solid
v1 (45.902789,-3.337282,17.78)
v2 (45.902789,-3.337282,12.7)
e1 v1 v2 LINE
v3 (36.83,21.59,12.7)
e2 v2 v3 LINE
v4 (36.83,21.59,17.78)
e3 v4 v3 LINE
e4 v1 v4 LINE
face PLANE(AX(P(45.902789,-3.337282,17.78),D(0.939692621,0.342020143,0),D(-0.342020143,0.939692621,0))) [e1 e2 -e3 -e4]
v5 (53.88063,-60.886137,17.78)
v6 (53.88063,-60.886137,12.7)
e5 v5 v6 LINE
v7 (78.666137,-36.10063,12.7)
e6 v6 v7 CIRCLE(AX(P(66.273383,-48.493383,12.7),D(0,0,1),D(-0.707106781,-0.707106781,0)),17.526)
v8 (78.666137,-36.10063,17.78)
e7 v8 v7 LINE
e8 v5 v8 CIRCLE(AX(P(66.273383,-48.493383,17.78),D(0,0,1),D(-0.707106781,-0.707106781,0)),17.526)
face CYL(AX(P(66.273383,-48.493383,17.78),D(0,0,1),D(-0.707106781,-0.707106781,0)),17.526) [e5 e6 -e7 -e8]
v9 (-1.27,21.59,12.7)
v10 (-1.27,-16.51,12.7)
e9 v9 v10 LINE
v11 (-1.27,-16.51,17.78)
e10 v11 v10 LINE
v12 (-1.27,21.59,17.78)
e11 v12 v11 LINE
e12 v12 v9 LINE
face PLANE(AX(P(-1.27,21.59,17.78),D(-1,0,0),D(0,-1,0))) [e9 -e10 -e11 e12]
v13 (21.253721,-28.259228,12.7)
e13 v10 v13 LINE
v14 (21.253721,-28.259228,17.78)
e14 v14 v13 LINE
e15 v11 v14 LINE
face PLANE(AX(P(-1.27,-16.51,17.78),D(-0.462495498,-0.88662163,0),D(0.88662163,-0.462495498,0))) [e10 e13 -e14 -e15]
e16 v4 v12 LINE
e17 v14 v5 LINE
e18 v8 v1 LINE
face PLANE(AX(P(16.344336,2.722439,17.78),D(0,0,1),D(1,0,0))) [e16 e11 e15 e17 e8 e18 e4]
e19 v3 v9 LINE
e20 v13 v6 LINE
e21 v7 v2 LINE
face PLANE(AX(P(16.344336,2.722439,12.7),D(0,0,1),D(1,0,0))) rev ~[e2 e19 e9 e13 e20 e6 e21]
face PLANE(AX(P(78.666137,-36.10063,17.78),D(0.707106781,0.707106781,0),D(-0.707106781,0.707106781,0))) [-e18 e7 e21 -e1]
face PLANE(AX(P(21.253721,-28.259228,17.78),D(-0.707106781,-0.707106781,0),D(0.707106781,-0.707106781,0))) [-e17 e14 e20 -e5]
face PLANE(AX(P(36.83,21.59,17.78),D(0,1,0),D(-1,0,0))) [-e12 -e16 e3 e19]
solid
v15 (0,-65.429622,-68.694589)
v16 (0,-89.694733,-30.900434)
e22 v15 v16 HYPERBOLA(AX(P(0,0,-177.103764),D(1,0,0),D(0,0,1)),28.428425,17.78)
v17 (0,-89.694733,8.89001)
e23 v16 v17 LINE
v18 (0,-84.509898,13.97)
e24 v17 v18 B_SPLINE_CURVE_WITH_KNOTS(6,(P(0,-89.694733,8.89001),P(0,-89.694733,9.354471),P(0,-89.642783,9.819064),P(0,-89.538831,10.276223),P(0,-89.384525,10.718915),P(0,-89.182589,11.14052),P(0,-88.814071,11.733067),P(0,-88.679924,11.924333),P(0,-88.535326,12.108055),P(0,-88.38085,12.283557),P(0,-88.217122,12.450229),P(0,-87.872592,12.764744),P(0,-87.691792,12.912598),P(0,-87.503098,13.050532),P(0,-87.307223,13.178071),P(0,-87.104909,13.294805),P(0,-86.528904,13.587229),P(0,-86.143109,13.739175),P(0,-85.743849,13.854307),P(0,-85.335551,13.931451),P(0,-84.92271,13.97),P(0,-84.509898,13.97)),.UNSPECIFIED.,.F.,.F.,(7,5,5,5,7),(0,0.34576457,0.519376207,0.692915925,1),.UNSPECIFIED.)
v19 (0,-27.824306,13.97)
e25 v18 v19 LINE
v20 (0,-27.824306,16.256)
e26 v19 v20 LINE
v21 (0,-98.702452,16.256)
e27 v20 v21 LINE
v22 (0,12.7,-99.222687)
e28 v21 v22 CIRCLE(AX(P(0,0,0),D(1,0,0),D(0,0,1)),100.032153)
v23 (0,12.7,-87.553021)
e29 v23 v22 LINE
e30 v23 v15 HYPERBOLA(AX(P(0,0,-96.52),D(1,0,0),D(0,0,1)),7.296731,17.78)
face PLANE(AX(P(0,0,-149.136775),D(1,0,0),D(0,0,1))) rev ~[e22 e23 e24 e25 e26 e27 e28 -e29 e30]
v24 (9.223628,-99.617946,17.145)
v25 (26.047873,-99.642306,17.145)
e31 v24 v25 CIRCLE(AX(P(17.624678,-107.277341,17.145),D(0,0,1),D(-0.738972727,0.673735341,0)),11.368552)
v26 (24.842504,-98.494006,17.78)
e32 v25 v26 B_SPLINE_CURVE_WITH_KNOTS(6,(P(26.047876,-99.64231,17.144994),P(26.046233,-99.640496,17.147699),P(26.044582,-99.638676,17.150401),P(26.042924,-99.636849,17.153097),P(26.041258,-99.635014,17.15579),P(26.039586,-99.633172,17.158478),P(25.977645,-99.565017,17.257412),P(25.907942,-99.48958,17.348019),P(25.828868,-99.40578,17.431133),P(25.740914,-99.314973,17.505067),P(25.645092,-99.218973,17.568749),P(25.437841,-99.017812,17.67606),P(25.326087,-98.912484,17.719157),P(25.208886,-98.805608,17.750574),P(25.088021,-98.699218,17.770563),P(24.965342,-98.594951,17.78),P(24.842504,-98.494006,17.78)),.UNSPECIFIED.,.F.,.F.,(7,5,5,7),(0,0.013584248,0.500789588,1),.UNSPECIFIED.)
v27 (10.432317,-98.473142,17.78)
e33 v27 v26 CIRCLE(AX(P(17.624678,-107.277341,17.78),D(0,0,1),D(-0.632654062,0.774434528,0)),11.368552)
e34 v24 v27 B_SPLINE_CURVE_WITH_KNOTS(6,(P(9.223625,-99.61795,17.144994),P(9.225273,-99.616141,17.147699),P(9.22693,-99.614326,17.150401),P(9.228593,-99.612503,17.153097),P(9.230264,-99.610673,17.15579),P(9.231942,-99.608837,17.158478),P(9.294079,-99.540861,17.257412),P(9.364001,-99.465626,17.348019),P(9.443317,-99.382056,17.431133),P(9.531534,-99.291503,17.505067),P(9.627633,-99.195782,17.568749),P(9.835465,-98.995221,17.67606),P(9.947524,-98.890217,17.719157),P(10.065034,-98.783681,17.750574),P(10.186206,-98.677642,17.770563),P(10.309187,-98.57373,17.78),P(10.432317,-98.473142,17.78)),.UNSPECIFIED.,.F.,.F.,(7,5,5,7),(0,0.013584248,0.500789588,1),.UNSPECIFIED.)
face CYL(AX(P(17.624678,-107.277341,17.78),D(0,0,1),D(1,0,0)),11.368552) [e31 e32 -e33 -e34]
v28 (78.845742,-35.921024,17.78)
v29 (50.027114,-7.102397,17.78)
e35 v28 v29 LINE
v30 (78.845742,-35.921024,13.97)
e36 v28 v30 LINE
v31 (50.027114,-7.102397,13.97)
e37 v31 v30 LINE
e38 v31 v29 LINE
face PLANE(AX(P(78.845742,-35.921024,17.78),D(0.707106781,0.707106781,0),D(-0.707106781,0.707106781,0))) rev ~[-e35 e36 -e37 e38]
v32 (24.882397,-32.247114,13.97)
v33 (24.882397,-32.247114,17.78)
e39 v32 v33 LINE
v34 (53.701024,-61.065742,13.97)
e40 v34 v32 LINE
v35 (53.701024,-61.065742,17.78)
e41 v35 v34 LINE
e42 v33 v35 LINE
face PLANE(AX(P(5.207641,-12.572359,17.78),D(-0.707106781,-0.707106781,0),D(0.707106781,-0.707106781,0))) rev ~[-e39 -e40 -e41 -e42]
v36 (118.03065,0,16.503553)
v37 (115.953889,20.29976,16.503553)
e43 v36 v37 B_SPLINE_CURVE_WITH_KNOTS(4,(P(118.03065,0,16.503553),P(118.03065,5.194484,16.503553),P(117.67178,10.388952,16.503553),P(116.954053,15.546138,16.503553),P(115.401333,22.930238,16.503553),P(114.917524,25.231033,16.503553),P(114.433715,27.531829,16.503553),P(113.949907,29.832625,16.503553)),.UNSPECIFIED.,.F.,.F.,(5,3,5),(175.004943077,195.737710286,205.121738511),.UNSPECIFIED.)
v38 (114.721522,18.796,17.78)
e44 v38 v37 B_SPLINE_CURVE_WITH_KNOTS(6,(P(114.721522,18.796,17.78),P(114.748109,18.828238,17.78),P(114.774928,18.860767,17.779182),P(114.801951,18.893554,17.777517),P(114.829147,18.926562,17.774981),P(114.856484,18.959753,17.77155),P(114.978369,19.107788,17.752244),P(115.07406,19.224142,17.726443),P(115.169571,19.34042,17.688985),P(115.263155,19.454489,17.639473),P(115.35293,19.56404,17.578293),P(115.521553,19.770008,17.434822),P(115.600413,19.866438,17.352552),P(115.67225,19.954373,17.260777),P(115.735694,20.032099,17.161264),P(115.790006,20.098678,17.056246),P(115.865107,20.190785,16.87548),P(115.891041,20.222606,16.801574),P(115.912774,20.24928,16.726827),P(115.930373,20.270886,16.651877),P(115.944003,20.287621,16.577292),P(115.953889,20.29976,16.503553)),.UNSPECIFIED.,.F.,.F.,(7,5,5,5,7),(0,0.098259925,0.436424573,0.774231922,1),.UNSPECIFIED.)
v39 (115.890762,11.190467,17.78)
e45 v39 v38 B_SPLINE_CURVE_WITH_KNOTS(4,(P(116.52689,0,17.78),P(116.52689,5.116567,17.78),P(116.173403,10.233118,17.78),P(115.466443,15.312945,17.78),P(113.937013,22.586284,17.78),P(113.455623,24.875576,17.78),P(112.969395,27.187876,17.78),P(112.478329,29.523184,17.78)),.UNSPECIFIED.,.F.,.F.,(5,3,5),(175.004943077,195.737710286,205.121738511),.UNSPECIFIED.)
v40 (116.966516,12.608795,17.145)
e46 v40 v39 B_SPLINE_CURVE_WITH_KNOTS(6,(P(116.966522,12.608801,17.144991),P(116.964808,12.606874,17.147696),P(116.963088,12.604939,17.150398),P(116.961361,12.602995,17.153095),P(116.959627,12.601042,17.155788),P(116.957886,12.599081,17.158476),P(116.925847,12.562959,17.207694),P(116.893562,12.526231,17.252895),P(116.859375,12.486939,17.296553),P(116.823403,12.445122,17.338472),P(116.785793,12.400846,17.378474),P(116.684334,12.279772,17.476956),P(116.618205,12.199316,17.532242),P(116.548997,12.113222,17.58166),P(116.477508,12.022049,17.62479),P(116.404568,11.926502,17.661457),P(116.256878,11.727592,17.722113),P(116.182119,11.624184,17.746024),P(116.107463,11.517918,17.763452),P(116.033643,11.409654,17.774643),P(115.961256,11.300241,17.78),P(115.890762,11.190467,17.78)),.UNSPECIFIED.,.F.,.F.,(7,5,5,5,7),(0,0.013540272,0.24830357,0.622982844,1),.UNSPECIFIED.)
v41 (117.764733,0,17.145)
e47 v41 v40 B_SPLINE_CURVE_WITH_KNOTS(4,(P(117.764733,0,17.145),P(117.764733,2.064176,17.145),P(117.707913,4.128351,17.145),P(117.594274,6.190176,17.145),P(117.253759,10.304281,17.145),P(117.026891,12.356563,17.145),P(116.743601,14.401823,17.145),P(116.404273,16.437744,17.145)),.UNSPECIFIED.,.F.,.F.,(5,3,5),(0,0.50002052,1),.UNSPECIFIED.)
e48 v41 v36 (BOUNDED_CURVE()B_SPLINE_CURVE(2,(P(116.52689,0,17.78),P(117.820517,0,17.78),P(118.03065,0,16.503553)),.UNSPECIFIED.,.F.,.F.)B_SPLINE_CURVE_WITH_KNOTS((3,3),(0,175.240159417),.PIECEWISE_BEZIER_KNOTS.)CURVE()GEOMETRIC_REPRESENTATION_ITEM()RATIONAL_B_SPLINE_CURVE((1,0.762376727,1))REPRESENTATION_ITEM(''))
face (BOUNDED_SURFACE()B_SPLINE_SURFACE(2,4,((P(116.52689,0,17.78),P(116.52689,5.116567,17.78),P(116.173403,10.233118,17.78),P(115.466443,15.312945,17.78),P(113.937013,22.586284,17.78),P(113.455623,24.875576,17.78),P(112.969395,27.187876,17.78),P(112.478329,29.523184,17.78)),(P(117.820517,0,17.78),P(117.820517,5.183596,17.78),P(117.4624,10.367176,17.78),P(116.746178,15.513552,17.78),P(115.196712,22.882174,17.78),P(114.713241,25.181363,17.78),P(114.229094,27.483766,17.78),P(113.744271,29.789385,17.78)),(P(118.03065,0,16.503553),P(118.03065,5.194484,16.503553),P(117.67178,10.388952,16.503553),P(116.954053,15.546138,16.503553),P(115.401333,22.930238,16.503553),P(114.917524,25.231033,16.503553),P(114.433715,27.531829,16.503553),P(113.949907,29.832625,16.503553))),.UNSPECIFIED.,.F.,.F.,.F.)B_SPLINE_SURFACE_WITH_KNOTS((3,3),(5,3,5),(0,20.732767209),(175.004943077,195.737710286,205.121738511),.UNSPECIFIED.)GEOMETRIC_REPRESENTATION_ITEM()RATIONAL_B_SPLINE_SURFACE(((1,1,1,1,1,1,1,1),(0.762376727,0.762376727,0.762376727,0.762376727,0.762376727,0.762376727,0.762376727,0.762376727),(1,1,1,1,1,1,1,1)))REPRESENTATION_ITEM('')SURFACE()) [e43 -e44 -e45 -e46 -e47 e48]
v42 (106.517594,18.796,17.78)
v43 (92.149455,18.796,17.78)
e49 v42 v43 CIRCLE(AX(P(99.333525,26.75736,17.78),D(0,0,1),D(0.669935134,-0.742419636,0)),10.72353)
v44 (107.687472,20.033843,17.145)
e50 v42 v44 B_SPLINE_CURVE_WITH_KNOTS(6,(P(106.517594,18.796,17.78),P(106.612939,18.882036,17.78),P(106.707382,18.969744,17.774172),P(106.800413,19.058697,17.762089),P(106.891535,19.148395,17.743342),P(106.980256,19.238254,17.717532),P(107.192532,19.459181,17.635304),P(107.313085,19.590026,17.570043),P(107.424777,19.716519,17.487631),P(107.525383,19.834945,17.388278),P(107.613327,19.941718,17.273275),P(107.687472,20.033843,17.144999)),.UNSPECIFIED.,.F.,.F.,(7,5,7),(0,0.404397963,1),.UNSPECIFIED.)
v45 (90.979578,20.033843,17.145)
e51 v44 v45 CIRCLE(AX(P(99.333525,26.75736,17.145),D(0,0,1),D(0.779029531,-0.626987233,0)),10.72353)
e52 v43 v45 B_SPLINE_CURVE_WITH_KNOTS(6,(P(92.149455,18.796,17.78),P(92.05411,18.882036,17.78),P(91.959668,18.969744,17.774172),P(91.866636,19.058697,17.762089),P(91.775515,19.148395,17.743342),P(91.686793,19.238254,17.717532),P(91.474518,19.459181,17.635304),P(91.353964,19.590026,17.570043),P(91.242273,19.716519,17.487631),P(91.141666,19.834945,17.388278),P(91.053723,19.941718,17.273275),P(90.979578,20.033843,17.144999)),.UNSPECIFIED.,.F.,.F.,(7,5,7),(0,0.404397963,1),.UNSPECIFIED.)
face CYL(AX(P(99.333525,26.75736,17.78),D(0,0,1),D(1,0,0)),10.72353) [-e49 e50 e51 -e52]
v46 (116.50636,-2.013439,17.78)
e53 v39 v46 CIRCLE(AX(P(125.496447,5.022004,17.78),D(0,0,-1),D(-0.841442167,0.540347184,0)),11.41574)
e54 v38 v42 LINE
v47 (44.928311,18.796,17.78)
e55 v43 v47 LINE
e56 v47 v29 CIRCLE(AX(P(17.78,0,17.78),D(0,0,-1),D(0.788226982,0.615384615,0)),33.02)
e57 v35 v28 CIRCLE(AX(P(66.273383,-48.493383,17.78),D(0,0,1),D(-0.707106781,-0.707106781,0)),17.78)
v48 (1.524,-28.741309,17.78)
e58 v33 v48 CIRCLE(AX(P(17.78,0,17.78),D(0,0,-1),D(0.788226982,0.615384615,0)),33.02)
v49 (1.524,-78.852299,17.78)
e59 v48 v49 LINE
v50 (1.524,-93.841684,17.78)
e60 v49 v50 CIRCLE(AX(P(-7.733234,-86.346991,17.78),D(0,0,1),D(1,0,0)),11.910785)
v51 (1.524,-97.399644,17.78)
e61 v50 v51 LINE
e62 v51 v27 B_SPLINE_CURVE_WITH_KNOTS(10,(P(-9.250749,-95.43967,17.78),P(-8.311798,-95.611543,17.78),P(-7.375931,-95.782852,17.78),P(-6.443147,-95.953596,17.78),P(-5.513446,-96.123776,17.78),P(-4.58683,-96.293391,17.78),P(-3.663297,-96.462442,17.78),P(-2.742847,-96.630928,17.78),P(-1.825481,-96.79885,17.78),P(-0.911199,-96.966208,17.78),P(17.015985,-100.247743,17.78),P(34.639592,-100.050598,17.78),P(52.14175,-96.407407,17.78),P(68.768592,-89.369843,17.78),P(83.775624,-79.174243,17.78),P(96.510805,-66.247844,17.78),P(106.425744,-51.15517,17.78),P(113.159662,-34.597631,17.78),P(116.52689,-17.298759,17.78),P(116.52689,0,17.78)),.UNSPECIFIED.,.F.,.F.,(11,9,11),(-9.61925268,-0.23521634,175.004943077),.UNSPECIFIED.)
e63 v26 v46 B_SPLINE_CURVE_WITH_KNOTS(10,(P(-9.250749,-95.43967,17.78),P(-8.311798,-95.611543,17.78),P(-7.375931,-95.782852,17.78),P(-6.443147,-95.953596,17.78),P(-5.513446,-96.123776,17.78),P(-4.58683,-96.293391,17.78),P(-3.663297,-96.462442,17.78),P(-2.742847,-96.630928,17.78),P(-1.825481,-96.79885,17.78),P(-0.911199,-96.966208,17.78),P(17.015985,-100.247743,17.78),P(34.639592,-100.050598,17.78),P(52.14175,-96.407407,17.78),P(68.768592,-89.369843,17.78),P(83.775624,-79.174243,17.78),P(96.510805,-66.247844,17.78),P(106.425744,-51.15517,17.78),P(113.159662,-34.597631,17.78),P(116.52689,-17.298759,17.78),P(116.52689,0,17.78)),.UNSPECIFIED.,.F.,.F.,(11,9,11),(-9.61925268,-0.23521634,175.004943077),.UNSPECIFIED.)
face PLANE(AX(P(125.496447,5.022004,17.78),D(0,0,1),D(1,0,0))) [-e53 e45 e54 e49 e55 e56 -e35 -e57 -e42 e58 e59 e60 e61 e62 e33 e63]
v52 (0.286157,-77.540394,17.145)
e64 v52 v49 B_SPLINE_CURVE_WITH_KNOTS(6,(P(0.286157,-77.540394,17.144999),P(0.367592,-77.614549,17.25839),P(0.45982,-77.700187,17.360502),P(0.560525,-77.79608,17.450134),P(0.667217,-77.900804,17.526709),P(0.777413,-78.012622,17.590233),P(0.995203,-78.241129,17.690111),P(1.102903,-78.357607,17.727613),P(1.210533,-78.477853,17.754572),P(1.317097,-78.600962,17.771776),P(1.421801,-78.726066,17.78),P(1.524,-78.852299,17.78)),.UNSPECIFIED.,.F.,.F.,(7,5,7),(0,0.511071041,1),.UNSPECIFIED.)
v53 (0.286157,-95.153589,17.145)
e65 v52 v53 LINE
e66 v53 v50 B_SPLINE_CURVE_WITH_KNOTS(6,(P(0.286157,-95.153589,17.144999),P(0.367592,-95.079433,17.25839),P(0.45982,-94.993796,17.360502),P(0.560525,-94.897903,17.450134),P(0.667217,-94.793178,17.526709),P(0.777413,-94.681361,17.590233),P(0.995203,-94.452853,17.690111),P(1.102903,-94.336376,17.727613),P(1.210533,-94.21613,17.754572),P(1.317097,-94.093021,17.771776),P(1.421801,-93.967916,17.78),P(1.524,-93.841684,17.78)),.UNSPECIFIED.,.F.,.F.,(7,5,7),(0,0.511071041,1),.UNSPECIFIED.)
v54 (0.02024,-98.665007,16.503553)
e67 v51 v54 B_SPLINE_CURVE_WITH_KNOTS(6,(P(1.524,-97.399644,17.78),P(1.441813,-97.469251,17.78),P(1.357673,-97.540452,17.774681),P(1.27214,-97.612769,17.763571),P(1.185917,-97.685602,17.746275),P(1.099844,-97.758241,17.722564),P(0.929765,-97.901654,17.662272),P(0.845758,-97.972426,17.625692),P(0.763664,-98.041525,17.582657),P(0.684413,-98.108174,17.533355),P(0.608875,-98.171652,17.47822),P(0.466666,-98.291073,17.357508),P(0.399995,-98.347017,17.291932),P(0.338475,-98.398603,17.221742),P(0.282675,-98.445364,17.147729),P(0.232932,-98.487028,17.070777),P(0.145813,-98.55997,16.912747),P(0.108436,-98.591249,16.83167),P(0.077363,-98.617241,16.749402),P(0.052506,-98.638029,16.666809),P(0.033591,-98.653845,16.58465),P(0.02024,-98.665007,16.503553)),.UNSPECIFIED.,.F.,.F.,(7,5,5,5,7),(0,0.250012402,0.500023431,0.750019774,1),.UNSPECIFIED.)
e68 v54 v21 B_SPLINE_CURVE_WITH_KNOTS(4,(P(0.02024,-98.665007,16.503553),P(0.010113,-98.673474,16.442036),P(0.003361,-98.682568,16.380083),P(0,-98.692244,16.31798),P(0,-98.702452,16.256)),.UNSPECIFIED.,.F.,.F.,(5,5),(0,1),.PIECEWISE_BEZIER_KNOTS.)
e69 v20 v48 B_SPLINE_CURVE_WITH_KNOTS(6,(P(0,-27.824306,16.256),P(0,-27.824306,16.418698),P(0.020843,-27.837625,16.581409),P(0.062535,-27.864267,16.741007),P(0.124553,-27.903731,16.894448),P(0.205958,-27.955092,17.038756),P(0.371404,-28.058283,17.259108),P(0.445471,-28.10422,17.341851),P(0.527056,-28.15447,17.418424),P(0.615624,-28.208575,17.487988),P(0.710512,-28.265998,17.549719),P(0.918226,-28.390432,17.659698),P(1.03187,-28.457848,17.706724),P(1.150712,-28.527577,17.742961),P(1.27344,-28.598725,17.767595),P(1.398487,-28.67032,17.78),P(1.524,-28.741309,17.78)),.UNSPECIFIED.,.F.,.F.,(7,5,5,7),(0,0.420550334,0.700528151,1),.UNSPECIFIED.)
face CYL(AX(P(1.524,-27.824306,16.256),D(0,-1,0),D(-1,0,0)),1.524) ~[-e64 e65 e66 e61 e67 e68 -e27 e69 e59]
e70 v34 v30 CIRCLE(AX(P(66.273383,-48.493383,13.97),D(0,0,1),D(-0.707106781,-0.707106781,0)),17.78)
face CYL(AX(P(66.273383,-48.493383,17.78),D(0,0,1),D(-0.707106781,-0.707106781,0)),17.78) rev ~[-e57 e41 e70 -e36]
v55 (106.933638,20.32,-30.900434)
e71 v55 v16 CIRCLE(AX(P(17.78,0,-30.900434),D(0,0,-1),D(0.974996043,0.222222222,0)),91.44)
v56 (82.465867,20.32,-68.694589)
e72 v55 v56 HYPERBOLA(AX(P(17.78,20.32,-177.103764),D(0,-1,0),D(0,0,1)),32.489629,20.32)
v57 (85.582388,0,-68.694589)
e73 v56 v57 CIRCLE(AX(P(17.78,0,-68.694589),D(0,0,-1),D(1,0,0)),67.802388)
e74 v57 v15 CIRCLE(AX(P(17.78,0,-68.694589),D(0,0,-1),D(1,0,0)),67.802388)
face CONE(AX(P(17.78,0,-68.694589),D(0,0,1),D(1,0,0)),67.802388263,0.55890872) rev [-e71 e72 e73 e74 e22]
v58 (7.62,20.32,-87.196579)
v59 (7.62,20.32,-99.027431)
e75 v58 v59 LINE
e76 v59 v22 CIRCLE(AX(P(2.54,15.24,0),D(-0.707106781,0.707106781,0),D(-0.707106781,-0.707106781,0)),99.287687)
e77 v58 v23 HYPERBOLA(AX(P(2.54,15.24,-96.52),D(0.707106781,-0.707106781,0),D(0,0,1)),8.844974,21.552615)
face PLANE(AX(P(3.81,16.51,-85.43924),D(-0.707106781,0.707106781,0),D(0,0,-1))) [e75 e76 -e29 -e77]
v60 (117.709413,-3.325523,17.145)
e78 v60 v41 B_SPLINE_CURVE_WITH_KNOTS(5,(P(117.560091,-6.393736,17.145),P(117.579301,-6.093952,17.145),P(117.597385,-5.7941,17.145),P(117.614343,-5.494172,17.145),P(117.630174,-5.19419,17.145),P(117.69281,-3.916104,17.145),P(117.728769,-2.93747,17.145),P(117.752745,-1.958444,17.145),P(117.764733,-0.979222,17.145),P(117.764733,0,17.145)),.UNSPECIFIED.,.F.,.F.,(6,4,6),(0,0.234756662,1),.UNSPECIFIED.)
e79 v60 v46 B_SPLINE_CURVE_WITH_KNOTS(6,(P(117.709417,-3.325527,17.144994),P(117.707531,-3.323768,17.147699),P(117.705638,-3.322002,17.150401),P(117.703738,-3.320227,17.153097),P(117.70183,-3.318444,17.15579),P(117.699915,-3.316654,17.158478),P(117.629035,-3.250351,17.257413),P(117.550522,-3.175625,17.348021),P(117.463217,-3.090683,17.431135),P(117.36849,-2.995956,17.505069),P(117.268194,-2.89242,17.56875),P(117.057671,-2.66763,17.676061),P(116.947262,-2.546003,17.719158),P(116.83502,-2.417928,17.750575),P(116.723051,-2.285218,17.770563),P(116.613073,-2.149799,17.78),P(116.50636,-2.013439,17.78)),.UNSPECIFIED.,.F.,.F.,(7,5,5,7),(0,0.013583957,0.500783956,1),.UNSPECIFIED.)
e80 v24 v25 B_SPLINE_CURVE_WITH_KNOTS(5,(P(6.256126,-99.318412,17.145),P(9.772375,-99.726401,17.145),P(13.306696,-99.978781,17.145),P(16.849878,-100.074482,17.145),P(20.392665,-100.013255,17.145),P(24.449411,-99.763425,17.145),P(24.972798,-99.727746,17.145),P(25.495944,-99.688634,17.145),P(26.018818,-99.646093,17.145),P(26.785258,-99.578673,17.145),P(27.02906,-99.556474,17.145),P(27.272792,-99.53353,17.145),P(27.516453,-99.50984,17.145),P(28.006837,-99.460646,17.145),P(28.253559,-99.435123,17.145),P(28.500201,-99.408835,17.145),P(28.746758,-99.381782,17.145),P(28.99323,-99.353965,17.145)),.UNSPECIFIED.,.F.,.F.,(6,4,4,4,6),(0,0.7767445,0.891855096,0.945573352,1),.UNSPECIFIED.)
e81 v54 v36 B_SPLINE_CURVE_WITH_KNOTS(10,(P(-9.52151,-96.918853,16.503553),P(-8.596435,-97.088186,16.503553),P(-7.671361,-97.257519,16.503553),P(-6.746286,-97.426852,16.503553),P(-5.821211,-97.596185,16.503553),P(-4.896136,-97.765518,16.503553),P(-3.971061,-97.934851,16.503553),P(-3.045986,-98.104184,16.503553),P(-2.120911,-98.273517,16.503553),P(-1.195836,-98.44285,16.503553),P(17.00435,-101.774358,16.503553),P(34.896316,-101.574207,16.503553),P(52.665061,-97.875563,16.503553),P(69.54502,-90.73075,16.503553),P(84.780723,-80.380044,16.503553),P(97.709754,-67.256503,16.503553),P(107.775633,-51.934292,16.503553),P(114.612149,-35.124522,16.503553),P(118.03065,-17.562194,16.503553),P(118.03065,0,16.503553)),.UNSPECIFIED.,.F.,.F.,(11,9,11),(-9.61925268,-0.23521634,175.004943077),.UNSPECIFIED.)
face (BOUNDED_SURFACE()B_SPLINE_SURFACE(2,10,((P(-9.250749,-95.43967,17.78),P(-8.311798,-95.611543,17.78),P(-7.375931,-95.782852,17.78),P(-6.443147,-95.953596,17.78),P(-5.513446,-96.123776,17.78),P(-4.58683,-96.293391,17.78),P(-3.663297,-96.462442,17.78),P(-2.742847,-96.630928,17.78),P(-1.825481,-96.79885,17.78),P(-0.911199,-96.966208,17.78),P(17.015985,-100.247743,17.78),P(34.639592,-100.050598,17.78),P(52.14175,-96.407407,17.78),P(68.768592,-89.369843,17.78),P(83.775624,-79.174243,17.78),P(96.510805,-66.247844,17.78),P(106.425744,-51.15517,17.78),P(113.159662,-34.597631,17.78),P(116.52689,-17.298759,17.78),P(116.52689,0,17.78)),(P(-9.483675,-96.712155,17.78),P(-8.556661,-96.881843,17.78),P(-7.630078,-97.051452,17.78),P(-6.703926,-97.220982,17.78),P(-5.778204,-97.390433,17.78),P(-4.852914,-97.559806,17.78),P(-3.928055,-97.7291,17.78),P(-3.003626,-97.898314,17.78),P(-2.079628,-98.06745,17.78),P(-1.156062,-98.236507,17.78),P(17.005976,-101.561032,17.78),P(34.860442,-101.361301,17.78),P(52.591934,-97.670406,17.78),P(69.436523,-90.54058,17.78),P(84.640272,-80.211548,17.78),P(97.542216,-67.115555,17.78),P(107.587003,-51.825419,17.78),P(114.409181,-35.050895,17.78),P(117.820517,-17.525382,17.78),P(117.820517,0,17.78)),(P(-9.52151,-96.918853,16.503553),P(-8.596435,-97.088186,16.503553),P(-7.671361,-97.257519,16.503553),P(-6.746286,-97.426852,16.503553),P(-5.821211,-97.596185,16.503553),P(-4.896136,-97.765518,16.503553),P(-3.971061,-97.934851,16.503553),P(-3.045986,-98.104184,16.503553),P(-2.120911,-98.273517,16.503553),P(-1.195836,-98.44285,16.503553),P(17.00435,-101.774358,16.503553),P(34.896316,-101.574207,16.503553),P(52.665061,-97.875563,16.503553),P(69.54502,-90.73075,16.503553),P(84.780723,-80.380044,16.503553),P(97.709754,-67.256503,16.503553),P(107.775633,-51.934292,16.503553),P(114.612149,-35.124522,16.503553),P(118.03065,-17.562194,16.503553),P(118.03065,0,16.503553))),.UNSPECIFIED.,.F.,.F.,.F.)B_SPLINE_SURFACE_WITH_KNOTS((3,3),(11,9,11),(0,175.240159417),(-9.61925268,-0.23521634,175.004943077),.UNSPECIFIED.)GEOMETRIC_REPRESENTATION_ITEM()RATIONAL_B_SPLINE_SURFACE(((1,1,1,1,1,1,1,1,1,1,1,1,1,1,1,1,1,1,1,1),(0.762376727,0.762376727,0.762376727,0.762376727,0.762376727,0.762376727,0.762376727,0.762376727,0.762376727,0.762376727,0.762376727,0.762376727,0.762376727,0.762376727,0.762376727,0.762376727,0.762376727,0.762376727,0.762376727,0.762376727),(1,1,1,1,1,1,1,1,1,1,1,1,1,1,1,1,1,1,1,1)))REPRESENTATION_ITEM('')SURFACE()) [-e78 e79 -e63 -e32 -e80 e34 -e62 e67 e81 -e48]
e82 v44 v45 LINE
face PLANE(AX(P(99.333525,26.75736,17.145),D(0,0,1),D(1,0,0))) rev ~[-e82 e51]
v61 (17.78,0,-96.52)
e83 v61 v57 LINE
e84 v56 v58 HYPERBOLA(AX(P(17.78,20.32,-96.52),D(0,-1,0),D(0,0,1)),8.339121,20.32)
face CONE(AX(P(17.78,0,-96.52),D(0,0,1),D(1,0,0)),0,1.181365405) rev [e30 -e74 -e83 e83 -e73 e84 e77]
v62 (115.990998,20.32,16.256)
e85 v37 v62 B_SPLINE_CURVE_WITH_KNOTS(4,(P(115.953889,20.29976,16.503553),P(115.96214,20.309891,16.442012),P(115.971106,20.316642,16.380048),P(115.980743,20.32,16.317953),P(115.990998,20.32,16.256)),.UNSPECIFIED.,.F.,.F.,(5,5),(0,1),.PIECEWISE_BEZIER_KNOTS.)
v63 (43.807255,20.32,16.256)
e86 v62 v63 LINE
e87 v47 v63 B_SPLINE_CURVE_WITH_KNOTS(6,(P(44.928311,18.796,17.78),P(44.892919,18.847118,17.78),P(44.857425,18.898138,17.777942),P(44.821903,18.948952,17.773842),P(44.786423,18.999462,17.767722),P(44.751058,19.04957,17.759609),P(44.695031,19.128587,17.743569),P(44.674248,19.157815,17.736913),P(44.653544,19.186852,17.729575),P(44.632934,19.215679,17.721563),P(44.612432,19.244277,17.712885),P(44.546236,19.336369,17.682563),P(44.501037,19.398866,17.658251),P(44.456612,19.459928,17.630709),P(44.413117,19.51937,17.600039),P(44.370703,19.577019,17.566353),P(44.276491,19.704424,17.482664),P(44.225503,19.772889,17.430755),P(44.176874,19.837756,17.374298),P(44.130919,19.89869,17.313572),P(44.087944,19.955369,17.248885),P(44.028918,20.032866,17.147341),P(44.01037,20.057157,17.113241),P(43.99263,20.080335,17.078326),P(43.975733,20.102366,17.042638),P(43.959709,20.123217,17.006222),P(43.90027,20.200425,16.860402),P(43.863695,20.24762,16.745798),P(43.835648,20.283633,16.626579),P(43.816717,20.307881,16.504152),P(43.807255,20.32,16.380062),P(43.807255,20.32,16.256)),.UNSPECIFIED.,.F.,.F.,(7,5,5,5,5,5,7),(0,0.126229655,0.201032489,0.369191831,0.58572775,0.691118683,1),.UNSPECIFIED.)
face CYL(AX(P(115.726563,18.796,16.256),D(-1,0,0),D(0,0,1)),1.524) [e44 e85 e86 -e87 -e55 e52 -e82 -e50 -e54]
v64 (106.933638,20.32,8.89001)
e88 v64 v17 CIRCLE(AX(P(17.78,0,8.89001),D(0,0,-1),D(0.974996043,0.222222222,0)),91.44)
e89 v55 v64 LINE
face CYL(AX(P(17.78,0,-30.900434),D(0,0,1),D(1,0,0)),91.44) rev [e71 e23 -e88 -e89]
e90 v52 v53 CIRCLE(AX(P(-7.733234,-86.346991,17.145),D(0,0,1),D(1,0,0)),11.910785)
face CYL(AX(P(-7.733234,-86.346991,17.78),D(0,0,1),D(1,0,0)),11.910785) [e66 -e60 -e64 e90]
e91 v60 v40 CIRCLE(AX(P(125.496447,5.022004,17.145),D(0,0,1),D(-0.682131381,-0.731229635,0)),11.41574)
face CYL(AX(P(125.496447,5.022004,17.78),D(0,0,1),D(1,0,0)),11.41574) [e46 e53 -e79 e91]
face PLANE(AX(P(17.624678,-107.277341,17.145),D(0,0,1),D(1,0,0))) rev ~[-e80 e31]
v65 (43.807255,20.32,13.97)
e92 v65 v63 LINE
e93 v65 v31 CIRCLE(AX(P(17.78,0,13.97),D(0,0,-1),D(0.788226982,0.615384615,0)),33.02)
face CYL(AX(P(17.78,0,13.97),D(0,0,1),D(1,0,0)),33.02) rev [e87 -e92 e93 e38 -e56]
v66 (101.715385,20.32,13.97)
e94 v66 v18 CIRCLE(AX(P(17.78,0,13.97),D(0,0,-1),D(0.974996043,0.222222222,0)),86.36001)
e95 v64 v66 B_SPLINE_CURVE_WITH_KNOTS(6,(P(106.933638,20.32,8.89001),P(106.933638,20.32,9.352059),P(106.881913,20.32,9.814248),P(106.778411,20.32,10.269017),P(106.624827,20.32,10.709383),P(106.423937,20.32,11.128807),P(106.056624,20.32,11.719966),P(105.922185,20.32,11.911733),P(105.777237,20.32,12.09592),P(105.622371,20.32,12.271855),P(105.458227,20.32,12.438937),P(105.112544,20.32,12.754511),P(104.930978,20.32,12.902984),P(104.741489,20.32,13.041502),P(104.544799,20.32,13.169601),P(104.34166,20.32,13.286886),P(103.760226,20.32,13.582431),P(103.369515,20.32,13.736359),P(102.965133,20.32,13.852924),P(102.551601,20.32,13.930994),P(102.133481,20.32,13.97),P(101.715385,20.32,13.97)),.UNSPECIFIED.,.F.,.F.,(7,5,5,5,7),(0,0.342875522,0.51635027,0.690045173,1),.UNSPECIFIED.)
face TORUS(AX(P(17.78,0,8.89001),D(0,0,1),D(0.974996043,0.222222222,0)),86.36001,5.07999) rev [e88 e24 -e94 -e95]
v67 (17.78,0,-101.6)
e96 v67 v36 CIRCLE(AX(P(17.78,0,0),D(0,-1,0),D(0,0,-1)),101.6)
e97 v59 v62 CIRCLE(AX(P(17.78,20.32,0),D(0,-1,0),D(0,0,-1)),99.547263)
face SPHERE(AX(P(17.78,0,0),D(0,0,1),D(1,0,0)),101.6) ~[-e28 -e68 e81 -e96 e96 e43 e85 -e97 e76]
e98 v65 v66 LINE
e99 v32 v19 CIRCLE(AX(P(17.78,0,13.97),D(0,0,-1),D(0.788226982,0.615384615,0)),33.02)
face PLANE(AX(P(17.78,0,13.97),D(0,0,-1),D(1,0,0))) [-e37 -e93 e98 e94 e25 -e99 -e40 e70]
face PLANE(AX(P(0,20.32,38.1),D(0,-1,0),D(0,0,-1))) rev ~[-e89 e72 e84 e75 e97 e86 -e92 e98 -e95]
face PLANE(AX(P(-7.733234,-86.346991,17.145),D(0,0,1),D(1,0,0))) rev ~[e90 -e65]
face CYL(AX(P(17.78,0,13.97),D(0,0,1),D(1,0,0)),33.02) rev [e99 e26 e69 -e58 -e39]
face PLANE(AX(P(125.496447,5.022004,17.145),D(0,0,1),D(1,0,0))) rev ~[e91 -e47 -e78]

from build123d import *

# Parameters (mm, degrees)
F3_DEPTH  = 127
F5_DEPTH  = 254
F8_SIZE   = 7.62
F10_DEPTH = 10.16
F11_R     = 5.07999
F12_R     = 1.524
F14_DEPTH = 5.08
F15_R     = 11.4157397534
F15_R_2   = 10.7235303576
F15_R_3   = 11.3685520534
F15_R_4   = 11.9107845334
F16_DEPTH = 0.635


# Not quite as in the source:
# - a fillet or chamfer is up to 0.001 mm smaller than in the source, because OpenCascade refuses the exact size


with BuildPart() as f1:
    # F0 (on Front) → F1 (revolve)
    with BuildSketch(Plane.XZ):
        with BuildLine():
            ThreePointArc((17.78, -101.6), (119.38, 0), (17.78, 101.6))
            Line((17.78, 101.6), (17.78, -101.6))
        make_face()
    revolve(axis=Axis((17.78, 0, 0), (0, 0, -1)))

    # F2 (on Front) → F3 (cut, symmetric)
    with BuildSketch(Plane.XZ):
        with BuildLine():
            Line((0, -149.136774605), (0, 17.78))
            Line((0, 17.78), (166.8577827513, 17.78))
            ThreePointArc((166.8577827513, 17.78), (-88.4894929474, 106.1792374941), (0, -149.136774605))
        make_face()
    extrude(amount=F3_DEPTH, both=True, mode=Mode.SUBTRACT)

    # F4 (on Right) → F5 (cut, symmetric)
    with BuildSketch(Plane.YZ):
        Polygon((156.3395333682, 38.1), (20.32, 38.1), (20.32, 17.78), (20.32, -154.5686624048), (156.3395333682, -154.5686624048), align=None)
    extrude(amount=F5_DEPTH, both=True, mode=Mode.SUBTRACT)

    # F6 (on Front) → F7 (revolve, cut)
    with BuildSketch(Plane.XZ):
        Polygon((50.8, 17.78), (17.78, 17.78), (17.78, -96.52), (85.5823882628, -68.6945889125), (109.22, -30.9004336539), (109.22, 13.97), (50.8, 13.97), align=None)
    revolve(axis=Axis((17.78, 0, 0), (0, 0, -1)), mode=Mode.SUBTRACT)

    # F8
    f8_edges = [f1.edges().sort_by_distance(p)[0] for p in [
        (0, 20.32, -91.692902),
    ]]
    chamfer(f8_edges, length=F8_SIZE)

    # F9 (on face) → F10 (cut)
    with BuildSketch(Plane.XY.offset(17.78)):
        with BuildLine():
            ThreePointArc((30.3523585695, 12.5723585695), (5.2076414305, 12.5723585695), (5.2076414305, -12.5723585695))
            Line((5.2076414305, -12.5723585695), (53.7010244843, -61.0657416233))
            ThreePointArc((53.7010244843, -61.0657416233), (78.8457416233, -61.0657416233), (78.8457416233, -35.9210244843))
            Line((78.8457416233, -35.9210244843), (30.3523585695, 12.5723585695))
        make_face()
    extrude(amount=-F10_DEPTH, mode=Mode.SUBTRACT)

    # F11 (radius 5.08 in the source; OpenCascade refuses exactly that, so slightly less here)
    f11_edges = [f1.edges().sort_by_distance(p)[0] for p in [
        (83.349501, -63.733148, 13.97),
    ]]
    fillet(f11_edges, radius=F11_R)

    # F12
    f12_edges = [f1.edges().sort_by_distance(p)[0] for p in [
        (0, -63.131822, 17.78),
        (79.766909, 20.32, 17.78),
        (81.919925, -76.762632, 17.78),
        (117.289389, 10.213375, 17.78),
    ]]
    fillet(f12_edges, radius=F12_R)

    # F15 (on face) → F16 (join)
    with BuildSketch(Plane.XY.offset(17.78)):
        with Locations((125.4964470863, 5.0220037811)):
            Circle(F15_R)
        with Locations((99.333524704, 26.7573595047)):
            Circle(F15_R_2)
        with Locations((17.6246780902, -107.277341187)):
            Circle(F15_R_3)
        with Locations((-7.7332337387, -86.3469913602)):
            Circle(F15_R_4)
    extrude(amount=-F16_DEPTH)


with BuildPart() as f14:
    # F13 (on face) → F14 (new body)
    with BuildSketch(Plane.XY.offset(17.78)):
        with BuildLine():
            Line((21.2537209734, -28.2592278675), (5.3872465529, -12.3927534471))
            ThreePointArc((5.3872465529, -12.3927534471), (5.3872465529, 12.3927534471), (30.1727534471, 12.3927534471))
            Line((30.1727534471, 12.3927534471), (45.9027885404, -3.3372816463))
            Line((45.9027885404, -3.3372816463), (36.83, 21.59))
            Line((36.83, 21.59), (-1.27, 21.59))
            Line((-1.27, 21.59), (-1.27, -16.51))
            Line((-1.27, -16.51), (21.2537209734, -28.2592278675))
        make_face()
        with BuildLine():
            ThreePointArc((30.1727534471, 12.3927534471), (5.3872465529, 12.3927534471), (5.3872465529, -12.3927534471))
            Line((5.3872465529, -12.3927534471), (21.2537209734, -28.2592278675))
            Line((21.2537209734, -28.2592278675), (53.8806296067, -60.8861365008))
            ThreePointArc((53.8806296067, -60.8861365008), (78.6661365008, -60.8861365008), (78.6661365008, -36.1006296067))
            Line((78.6661365008, -36.1006296067), (45.9027885404, -3.3372816463))
            Line((45.9027885404, -3.3372816463), (30.1727534471, 12.3927534471))
        make_face()
    extrude(amount=-F14_DEPTH)


solid = Compound([f1.part, f14.part])
